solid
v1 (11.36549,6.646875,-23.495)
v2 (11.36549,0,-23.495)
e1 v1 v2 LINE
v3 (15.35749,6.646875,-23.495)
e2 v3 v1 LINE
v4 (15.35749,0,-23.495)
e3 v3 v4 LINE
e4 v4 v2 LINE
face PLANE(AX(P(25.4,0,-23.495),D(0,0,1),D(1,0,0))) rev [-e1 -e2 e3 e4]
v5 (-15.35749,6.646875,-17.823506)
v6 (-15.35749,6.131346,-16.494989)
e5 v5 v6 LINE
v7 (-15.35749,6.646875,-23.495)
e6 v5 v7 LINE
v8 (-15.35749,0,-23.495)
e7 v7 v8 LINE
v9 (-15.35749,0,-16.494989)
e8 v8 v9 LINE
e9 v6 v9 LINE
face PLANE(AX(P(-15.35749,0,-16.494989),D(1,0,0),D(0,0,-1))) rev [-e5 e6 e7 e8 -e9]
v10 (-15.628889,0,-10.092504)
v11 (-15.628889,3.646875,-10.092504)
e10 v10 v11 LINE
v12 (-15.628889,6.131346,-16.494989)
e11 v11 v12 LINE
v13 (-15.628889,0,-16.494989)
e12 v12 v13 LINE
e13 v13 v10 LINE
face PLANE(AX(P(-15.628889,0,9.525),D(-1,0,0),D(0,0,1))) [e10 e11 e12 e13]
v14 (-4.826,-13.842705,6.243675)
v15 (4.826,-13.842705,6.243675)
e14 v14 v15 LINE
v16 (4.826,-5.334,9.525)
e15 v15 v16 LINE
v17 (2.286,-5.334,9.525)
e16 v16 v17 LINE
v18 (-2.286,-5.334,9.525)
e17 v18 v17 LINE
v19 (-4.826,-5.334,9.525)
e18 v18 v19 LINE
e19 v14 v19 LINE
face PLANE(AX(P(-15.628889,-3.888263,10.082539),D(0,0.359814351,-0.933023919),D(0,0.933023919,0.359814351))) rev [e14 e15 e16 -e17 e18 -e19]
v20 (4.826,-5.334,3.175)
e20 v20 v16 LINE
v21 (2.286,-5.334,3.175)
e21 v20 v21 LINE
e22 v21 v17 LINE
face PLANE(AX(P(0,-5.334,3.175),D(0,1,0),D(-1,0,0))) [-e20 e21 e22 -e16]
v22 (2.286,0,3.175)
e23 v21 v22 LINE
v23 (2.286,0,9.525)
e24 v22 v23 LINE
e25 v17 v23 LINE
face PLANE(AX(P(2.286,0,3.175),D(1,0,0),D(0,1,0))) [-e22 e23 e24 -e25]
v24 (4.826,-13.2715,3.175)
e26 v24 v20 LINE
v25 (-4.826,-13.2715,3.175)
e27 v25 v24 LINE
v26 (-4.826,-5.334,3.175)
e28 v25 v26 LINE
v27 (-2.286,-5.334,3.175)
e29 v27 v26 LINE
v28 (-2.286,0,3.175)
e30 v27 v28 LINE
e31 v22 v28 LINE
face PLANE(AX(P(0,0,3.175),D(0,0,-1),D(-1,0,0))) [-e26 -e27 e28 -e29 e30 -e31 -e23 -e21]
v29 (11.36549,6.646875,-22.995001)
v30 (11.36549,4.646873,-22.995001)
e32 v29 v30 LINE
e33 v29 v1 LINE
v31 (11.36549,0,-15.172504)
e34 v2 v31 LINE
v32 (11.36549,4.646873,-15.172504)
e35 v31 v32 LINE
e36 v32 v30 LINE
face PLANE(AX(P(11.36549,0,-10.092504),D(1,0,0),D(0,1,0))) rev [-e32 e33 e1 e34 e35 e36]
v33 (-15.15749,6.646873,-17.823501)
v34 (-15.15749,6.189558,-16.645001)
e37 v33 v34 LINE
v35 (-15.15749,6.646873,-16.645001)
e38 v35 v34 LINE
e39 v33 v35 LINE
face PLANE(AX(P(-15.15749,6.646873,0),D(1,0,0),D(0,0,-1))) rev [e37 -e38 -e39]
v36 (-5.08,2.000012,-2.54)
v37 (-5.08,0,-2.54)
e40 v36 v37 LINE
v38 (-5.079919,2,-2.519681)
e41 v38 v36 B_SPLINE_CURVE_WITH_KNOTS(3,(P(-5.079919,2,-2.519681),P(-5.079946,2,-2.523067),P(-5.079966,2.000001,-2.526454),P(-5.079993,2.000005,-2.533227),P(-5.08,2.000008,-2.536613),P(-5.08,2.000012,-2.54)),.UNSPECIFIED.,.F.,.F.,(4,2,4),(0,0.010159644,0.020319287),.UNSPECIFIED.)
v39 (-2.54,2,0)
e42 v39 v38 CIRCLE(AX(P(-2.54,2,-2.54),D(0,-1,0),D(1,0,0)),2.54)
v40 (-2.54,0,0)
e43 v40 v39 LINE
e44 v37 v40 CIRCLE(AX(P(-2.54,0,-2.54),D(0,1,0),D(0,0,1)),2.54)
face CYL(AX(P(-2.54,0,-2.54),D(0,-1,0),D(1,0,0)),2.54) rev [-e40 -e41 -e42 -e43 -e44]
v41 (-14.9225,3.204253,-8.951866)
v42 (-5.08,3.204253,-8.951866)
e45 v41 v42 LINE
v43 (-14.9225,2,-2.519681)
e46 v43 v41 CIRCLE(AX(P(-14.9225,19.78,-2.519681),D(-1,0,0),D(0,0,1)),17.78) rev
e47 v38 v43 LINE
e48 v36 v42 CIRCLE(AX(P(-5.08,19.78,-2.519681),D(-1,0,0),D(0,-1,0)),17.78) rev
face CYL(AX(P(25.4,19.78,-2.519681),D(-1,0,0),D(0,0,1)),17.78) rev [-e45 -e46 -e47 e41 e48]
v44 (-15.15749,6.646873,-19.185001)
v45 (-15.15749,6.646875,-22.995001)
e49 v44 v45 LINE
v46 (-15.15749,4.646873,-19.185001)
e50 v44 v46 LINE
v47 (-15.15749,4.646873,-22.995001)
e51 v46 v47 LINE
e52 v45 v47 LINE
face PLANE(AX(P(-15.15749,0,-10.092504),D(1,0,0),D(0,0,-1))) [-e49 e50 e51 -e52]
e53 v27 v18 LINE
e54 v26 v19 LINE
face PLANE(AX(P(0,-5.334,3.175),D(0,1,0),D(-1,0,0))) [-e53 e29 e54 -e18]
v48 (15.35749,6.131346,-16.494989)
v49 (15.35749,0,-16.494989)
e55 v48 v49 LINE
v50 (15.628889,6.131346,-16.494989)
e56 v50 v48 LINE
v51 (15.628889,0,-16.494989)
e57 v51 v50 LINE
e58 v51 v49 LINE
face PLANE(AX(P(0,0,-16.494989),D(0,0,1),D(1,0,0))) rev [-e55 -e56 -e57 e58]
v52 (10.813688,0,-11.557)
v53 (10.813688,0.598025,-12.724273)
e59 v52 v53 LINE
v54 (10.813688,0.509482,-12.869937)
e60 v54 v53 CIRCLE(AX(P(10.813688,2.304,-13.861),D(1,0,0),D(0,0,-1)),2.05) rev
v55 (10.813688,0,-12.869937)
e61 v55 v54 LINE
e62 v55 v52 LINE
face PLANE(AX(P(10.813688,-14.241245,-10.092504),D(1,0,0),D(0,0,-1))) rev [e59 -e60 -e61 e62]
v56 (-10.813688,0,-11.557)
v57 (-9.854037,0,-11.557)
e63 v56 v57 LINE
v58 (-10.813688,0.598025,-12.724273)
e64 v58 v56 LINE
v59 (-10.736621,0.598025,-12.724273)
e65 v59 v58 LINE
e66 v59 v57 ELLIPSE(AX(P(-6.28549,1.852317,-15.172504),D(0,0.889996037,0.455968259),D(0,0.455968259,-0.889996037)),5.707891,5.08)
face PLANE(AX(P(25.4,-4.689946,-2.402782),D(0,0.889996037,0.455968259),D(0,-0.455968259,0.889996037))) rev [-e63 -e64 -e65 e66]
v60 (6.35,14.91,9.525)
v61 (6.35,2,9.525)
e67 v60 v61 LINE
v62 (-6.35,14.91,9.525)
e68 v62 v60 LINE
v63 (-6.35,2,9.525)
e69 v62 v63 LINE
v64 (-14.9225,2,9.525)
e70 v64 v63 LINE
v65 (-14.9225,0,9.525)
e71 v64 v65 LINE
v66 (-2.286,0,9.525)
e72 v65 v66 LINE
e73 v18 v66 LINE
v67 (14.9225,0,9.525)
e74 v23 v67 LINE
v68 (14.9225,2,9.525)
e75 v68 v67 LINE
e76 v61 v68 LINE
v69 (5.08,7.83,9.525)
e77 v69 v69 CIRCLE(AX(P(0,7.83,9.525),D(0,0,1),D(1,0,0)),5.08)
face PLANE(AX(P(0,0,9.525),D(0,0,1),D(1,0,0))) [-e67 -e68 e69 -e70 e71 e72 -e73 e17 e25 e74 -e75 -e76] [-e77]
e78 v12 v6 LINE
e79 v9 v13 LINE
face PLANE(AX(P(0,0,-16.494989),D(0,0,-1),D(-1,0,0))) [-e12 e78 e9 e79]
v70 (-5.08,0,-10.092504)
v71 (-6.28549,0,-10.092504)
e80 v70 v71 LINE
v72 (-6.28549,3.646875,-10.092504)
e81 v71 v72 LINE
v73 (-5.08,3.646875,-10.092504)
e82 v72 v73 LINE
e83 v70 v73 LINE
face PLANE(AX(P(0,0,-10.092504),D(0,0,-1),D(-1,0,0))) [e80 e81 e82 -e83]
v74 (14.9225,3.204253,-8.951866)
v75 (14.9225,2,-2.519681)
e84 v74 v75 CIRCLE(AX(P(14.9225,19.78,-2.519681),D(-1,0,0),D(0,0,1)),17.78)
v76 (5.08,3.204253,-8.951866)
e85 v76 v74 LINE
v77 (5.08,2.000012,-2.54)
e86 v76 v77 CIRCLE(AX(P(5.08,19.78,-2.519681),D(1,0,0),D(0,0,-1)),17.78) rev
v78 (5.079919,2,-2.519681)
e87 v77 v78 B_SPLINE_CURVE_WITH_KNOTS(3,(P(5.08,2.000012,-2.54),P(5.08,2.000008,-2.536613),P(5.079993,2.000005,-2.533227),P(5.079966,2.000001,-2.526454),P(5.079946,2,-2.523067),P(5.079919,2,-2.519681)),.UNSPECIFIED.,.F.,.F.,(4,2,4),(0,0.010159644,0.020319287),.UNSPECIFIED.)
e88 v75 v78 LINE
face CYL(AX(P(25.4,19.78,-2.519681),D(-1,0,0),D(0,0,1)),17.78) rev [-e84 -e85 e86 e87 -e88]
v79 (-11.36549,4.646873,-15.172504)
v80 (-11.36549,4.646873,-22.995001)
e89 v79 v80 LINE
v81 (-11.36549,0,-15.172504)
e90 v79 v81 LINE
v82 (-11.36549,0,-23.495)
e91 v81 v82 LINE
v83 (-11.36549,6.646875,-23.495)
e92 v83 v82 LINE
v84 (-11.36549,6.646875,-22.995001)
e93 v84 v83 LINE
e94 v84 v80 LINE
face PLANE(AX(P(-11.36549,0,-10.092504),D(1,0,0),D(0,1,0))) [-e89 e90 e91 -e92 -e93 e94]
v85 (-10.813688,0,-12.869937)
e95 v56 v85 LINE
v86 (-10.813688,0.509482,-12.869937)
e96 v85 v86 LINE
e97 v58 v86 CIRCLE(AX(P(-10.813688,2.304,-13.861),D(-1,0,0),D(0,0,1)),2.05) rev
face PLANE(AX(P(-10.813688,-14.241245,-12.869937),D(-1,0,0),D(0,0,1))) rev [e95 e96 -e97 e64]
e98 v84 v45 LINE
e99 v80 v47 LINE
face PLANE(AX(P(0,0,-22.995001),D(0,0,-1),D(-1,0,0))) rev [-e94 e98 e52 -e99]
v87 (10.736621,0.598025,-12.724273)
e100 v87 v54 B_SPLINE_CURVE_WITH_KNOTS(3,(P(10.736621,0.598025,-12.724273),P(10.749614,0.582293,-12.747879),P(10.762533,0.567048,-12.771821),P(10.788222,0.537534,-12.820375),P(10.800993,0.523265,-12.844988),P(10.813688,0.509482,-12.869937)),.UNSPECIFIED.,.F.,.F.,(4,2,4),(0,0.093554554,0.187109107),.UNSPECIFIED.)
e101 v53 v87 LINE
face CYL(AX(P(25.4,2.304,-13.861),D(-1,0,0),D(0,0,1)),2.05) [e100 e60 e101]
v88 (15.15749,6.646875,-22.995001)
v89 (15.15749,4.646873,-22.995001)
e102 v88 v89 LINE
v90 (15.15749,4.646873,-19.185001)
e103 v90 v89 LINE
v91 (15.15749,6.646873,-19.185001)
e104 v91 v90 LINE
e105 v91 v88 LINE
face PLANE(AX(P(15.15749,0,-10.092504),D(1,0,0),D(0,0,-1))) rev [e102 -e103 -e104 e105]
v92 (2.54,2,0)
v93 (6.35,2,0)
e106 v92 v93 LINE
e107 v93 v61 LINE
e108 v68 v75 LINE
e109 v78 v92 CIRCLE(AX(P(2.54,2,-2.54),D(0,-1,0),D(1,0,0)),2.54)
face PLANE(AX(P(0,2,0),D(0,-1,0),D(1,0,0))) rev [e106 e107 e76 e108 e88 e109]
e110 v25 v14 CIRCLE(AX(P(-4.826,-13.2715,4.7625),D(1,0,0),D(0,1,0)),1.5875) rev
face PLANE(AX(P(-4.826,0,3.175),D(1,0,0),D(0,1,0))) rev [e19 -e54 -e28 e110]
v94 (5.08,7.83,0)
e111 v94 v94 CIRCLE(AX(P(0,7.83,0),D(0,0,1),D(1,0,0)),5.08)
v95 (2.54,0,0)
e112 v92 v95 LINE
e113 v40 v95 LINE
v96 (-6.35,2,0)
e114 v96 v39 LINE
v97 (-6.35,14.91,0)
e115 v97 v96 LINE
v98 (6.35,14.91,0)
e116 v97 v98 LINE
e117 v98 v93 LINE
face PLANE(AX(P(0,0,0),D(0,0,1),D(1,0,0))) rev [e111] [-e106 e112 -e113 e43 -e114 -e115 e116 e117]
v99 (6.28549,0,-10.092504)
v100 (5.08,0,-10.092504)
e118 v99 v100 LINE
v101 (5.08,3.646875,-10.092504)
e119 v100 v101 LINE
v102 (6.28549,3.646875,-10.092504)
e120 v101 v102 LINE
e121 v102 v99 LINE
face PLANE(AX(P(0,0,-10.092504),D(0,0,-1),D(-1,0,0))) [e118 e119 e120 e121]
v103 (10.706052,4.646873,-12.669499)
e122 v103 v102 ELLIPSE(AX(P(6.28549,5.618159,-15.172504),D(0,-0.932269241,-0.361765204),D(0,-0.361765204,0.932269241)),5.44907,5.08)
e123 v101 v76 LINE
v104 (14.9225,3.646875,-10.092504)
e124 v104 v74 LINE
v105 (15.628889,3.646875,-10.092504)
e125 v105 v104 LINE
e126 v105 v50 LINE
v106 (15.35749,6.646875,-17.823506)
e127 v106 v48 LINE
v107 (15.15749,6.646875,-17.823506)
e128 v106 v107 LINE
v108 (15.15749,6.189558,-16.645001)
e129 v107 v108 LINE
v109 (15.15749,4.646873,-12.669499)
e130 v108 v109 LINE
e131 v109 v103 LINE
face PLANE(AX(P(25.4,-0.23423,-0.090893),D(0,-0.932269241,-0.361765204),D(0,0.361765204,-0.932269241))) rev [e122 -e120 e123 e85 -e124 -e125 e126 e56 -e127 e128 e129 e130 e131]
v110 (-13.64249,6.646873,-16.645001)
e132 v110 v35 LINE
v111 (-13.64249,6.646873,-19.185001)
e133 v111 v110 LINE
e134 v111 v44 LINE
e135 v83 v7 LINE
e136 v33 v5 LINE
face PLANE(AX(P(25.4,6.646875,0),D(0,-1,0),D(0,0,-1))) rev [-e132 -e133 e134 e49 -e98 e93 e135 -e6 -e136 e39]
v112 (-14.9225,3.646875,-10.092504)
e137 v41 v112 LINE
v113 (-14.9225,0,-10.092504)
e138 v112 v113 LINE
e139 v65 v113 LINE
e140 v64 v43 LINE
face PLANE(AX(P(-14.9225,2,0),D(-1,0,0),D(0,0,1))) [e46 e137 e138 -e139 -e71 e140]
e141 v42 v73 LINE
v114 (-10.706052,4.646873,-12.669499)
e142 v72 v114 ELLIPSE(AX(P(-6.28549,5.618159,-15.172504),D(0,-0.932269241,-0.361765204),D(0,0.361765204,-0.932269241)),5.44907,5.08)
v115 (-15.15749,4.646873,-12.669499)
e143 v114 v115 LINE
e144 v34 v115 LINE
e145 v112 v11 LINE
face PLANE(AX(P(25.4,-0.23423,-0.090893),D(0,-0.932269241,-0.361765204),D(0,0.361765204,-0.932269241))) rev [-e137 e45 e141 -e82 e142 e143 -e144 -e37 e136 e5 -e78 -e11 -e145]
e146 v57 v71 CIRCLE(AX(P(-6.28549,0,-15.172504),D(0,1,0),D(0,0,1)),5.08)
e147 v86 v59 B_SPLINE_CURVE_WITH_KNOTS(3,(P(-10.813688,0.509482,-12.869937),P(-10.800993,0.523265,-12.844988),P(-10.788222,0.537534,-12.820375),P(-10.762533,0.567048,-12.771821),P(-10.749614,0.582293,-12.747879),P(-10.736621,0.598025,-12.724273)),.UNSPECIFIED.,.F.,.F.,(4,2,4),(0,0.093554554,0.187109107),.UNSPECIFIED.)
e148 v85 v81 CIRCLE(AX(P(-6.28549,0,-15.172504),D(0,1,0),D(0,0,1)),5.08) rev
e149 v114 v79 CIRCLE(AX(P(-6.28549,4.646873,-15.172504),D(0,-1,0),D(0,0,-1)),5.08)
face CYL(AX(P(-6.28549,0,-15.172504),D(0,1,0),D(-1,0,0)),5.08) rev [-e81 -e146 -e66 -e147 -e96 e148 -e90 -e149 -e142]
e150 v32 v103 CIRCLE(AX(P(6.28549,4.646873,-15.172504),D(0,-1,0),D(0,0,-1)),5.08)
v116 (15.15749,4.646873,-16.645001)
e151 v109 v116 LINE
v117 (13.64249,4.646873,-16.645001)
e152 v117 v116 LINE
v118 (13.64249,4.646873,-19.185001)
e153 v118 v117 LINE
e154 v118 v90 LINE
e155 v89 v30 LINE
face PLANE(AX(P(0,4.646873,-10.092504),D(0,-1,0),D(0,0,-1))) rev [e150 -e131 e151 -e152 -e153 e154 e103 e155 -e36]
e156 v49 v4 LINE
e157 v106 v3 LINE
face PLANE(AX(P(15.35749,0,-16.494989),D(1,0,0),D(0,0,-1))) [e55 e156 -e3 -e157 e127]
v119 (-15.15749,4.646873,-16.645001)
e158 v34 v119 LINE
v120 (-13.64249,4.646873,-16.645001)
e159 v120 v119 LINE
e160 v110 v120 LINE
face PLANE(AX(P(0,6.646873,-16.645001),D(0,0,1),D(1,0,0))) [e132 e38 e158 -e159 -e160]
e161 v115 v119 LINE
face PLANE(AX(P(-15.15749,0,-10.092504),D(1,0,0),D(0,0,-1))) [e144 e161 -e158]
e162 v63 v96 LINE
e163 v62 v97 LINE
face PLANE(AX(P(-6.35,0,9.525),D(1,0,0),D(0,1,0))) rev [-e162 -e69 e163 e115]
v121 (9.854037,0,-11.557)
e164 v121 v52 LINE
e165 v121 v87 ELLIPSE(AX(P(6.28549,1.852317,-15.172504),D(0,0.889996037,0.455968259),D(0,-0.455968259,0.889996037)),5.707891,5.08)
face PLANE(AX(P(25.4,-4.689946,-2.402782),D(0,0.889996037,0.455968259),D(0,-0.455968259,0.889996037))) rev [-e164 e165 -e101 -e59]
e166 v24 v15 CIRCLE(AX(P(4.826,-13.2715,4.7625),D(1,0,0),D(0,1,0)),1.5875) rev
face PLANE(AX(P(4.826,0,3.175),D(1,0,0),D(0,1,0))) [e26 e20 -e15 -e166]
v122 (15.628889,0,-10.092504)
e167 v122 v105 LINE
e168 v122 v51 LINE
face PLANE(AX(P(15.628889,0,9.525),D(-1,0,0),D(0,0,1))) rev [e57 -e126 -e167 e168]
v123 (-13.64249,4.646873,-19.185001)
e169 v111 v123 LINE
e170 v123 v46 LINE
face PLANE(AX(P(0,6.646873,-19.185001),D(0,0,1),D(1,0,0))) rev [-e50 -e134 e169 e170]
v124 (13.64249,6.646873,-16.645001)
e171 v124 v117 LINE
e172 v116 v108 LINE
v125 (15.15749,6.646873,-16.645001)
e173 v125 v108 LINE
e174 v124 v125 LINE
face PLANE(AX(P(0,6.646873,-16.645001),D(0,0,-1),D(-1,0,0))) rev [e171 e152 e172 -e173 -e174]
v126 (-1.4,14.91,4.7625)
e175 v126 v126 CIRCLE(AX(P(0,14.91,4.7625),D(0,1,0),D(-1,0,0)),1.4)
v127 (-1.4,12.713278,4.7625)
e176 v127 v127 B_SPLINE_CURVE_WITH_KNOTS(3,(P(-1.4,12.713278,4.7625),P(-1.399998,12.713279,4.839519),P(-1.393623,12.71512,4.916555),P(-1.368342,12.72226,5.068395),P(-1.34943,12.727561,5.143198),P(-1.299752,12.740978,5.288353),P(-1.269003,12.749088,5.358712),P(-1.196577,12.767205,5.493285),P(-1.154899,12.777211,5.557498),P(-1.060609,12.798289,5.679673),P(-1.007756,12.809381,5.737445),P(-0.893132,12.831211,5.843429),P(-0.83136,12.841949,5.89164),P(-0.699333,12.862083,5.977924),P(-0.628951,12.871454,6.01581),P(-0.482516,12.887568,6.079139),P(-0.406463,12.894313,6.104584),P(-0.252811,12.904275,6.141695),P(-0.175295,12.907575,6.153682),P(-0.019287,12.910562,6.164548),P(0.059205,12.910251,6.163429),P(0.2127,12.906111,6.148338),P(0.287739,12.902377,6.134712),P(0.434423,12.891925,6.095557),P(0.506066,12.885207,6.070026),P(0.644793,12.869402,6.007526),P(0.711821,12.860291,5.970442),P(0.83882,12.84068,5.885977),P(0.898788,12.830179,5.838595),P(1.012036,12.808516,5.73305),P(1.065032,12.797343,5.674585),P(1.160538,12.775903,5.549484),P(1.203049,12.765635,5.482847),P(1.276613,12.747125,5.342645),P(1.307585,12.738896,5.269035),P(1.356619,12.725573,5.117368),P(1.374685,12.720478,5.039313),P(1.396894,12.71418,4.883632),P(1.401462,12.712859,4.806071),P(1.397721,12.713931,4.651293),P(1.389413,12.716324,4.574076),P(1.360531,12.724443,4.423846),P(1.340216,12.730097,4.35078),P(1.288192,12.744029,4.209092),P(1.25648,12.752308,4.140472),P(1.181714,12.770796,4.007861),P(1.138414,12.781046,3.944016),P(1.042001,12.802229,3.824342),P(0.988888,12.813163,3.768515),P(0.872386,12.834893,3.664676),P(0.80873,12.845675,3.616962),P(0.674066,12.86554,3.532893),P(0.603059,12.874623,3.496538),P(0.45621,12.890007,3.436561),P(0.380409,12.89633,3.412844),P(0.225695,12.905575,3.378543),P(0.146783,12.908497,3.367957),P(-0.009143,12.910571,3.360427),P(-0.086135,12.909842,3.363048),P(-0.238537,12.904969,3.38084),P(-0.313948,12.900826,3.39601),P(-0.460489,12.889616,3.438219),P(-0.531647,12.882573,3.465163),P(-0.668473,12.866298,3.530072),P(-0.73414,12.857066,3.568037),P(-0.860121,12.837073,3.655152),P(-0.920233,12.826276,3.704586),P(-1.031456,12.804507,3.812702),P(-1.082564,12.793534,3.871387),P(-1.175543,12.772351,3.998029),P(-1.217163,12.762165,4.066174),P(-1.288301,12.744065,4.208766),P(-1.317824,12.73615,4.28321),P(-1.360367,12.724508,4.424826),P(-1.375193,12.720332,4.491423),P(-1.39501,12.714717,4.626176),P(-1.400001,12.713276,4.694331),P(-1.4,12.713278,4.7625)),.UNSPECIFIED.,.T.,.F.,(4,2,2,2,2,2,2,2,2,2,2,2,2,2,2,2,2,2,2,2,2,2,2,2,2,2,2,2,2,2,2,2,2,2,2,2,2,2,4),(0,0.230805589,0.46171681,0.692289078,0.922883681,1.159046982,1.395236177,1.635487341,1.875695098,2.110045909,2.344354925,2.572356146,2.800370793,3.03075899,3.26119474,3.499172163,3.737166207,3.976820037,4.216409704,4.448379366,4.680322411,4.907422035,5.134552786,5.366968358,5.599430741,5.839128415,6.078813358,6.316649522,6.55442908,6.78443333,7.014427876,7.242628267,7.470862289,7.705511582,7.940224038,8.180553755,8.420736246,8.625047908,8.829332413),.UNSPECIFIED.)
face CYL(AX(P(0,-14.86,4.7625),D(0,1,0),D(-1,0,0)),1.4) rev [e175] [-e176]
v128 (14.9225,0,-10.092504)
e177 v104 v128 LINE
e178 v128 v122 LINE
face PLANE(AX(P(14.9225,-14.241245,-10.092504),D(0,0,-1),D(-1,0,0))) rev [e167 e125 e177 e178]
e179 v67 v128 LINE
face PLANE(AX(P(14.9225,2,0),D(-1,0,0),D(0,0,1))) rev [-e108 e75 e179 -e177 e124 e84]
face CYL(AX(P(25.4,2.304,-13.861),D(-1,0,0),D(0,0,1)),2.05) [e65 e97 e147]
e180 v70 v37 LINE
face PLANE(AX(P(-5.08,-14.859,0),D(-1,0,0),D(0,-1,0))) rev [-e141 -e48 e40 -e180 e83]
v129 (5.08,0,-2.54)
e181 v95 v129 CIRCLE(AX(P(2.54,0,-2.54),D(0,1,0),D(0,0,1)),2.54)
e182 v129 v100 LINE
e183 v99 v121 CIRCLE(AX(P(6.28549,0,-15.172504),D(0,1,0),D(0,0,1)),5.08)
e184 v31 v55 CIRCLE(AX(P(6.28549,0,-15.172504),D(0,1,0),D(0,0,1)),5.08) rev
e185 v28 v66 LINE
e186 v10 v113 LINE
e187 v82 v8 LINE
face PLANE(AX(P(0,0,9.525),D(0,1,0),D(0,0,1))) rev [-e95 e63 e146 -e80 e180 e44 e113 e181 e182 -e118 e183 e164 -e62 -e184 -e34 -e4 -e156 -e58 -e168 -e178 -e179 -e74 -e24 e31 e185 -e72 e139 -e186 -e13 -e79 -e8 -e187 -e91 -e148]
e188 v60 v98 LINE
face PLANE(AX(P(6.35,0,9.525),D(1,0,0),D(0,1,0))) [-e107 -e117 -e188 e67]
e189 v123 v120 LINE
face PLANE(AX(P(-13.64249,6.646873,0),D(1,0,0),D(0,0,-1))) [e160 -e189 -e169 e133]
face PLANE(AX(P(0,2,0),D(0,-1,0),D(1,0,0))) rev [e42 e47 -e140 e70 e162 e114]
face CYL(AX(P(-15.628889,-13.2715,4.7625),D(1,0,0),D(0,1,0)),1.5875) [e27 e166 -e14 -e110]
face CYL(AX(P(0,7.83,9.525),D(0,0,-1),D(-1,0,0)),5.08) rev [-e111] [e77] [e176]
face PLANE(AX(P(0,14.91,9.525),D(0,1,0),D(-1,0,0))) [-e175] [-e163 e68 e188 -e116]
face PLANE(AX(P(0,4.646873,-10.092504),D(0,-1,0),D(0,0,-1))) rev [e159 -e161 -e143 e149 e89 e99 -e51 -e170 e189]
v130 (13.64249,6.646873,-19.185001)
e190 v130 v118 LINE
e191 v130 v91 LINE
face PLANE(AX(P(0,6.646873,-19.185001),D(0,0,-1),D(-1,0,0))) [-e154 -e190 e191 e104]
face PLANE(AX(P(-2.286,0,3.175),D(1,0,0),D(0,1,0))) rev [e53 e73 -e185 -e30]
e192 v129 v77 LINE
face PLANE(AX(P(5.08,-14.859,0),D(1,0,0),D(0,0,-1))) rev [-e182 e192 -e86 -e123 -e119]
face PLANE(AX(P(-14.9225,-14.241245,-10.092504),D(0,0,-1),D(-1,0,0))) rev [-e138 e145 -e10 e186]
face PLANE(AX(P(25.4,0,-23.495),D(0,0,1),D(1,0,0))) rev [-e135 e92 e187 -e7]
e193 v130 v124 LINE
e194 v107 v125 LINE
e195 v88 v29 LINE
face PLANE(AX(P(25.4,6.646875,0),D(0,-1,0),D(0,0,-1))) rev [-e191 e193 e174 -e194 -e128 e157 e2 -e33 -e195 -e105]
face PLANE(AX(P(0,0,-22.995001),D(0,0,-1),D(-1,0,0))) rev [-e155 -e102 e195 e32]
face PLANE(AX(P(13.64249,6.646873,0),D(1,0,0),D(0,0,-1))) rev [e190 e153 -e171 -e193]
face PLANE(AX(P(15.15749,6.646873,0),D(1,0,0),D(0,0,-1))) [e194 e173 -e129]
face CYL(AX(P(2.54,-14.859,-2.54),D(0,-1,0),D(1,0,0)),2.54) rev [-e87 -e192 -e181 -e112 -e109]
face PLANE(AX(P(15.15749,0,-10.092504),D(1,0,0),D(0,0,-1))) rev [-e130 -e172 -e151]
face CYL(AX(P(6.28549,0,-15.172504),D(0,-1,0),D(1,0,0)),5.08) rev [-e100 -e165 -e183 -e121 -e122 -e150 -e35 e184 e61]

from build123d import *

# Parameters (mm, degrees)
SKETCH2_W                = 12.7
SKETCH2_H                = 14.91
SKETCH2_R                = 5.08
BOSS_EXTRUDE1_DEPTH      = 9.525
BOSS_EXTRUDE2_START      = 9.525
BOSS_EXTRUDE2_DEPTH      = 6.35
BOSS_EXTRUDE3_DEPTH      = 2
BOSS_EXTRUDE7_START      = -25.4
BOSS_EXTRUDE7_DEPTH      = 50.8
SKETCH5_W                = 9.77111141
SKETCH5_H                = 3
CUT_EXTRUDE1_DEPTH       = 68.279429146
CUT_EXTRUDE2_START       = -12.902497
SKETCH6_W                = 30.31497918
SKETCH6_H                = 2.000002
SKETCH6_W_2              = 22.73097918
SKETCH6_H_2              = 6.646875
CUT_EXTRUDE2_DEPTH       = 12.902497
CUT_EXTRUDE3_START       = 0.499999
SKETCH6_3_W              = 22.73097918
SKETCH6_3_H              = 2.000002
SKETCH6_3_H_2            = 4.646873
SKETCH6_3_W_2            = 0.271399
SKETCH6_3_H_3            = 3
CUT_EXTRUDE3_DEPTH       = 7.0000114
FILLET2_R                = 17.78
CUT_EXTRUDE4_DEPTH       = 33.871006443
CUT_EXTRUDE4_DEPTH_BACK  = 33.871006443
SKETCH7_W                = 10.16
SKETCH7_H                = 10.092503778
FILLET3_R                = 2.54
SKETCH8_W                = 1.515
SKETCH8_H                = 2.54
BOSS_EXTRUDE8_DEPTH      = 2
FILLET4_R                = 5.08
CUT_EXTRUDE5_DEPTH       = 35.535859512
BOSS_EXTRUDE9_DEPTH      = 3.646875
SET_SCREW_CUT_REACH      = 43.018
SET_SCREW_CUT_END_RADIUS = 5.08
SKETCH12_R               = 1.4


# Read off the part's stored shape, not the designer's step: Boss-Extrude7
with BuildPart() as part:
    # Sketch2 → Boss-Extrude1 (new body)
    with BuildSketch(Plane.XY):
        with Locations((0, 7.455)):
            Rectangle(SKETCH2_W, SKETCH2_H)
        with Locations(Location((0, 7.83, 0), (0, 0, 180))):
            Circle(SKETCH2_R, mode=Mode.SUBTRACT)
    extrude(amount=BOSS_EXTRUDE1_DEPTH)

    # Sketch2<3> → Boss-Extrude2 (add)
    with BuildSketch(Plane.XY.offset(BOSS_EXTRUDE2_START)):
        Polygon((2.286, 0), (-2.286, 0), (-2.286, -5.334), (-4.826, -5.334), (-4.826, -14.859), (4.826, -14.859), (4.826, -5.334), (2.286, -5.334), align=None)
    extrude(amount=-BOSS_EXTRUDE2_DEPTH)

    # Sketch3 → Boss-Extrude3 (add)
    with BuildSketch(Plane.XZ):
        Polygon((14.9225, 9.525), (-14.9225, 9.525), (-14.9225, -11.557), (-10.85748959, -11.557), (10.85748959, -11.557), (14.9225, -11.557), align=None)
    extrude(amount=-BOSS_EXTRUDE3_DEPTH)

    # Boss-Extrude7 outline → Boss-Extrude7 (add)
    with BuildSketch(Plane(origin=(0, 0, 0), x_dir=(0, 0, -1), z_dir=(1, 0, 0)).offset(BOSS_EXTRUDE7_START)):
        with BuildLine():
            Line((5.848505491, 2), (11.557, 0))
            Line((11.557, 0), (12.724273166, 0.598024588))
            ThreePointArc((12.724273166, 0.598024588), (12.796184179, 0.55223881), (12.869936616, 0.509482413))
            Line((12.869936616, 0.509482413), (20.955, 3.646875))
            Line((20.955, 3.646875), (23.495, 3.646875))
            Line((23.495, 3.646875), (23.495, 6.646875))
            Line((23.495, 6.646875), (17.823506348, 6.646875))
            Line((17.823506348, 6.646875), (5.848505491, 2))
        make_face()
    extrude(amount=BOSS_EXTRUDE7_DEPTH)

    # Sketch5 → Cut-Extrude1 (cut, through all)
    with BuildSketch(Plane(origin=(0, 37.971305566, -23.495), x_dir=(1, 0, 0), z_dir=(0, 0, 1))):
        Polygon((25.4, -37.971305566), (25.4, -34.324430566), (15.62888859, -34.324430566), (14.9225, -34.324430566), (14.9225, -37.971305566), align=None)
        with Locations((20.514444295, -32.824430566)):
            Rectangle(SKETCH5_W, SKETCH5_H)
        Polygon((-25.4, -34.324430566), (-25.4, -37.971305566), (-14.9225, -37.971305566), (-14.9225, -34.324430566), (-15.62888859, -34.324430566), align=None)
        with Locations((-20.514444295, -32.824430566)):
            Rectangle(SKETCH5_W, SKETCH5_H)
    extrude(amount=CUT_EXTRUDE1_DEPTH, mode=Mode.SUBTRACT)

    # Sketch6 → Cut-Extrude2 (cut)
    with BuildSketch(Plane(origin=(0, 0, -22.995001), x_dir=(-1, 0, 0), z_dir=(0, 0, -1)).offset(CUT_EXTRUDE2_START)):
        with Locations((0, 5.646874)):
            Rectangle(SKETCH6_W, SKETCH6_H)
        with Locations((0, 3.3234375)):
            Rectangle(SKETCH6_W_2, SKETCH6_H_2)
    extrude(amount=CUT_EXTRUDE2_DEPTH, mode=Mode.SUBTRACT)

    # Sketch6<3> → Cut-Extrude3 (cut)
    with BuildSketch(Plane(origin=(0, 0, -22.995001), x_dir=(-1, 0, 0), z_dir=(0, 0, -1)).offset(CUT_EXTRUDE3_START)):
        with Locations((0, 5.646874)):
            Rectangle(SKETCH6_3_W, SKETCH6_3_H)
        with Locations((0, 2.3234365)):
            Rectangle(SKETCH6_3_W, SKETCH6_3_H_2)
        with Locations((-15.49318909, 5.146875)):
            Rectangle(SKETCH6_3_W_2, SKETCH6_3_H_3)
        with Locations((15.49318909, 5.146875)):
            Rectangle(SKETCH6_3_W_2, SKETCH6_3_H_3)
    extrude(amount=-CUT_EXTRUDE3_DEPTH, mode=Mode.SUBTRACT)

    # Fillet2
    fillet2_edges = [part.edges().sort_by_distance(p)[0] for p in [
        (0, 2, -5.848505491),
    ]]
    fillet(fillet2_edges, radius=FILLET2_R)

    # Sketch7 → Cut-Extrude4 (cut, two sides: drawn at the far end of the back side and taken through both)
    with BuildSketch(Plane(origin=(0, 2, 0), x_dir=(1, 0, 0), z_dir=(0, 1, 0)).offset(-CUT_EXTRUDE4_DEPTH_BACK)):
        with Locations((0, 5.046251889)):
            Rectangle(SKETCH7_W, SKETCH7_H)
    extrude(amount=CUT_EXTRUDE4_DEPTH + CUT_EXTRUDE4_DEPTH_BACK, mode=Mode.SUBTRACT)

    # Fillet3
    # the kernel refuses this fillet: 2.54 mm, written as the material it adds along each edge
    with BuildSketch(Plane(origin=(-5.08, 2, 0), x_dir=(1, 0, 0), z_dir=(0, -1, 0))) as fillet3_piece_1:
        with BuildLine():
            CenterArc((FILLET3_R, -FILLET3_R), FILLET3_R, 90, 90)
            Line((0, -FILLET3_R), (-FILLET3_R * 0.02, -FILLET3_R))
            Line((-FILLET3_R * 0.02, -FILLET3_R), (-FILLET3_R * 0.02, FILLET3_R * 0.02))
            Line((-FILLET3_R * 0.02, FILLET3_R * 0.02), (FILLET3_R, FILLET3_R * 0.02))
            Line((FILLET3_R, FILLET3_R * 0.02), (FILLET3_R, 0))
        make_face()
    extrude(amount=2)
    with BuildSketch(Plane(origin=(5.08, 0, 0), x_dir=(0, 0, -1), z_dir=(0, 1, 0))) as fillet3_piece_2:
        with BuildLine():
            CenterArc((FILLET3_R, FILLET3_R), FILLET3_R, 180, 90)
            Line((0, FILLET3_R), (-FILLET3_R * 0.02, FILLET3_R))
            Line((-FILLET3_R * 0.02, FILLET3_R), (-FILLET3_R * 0.02, -FILLET3_R * 0.02))
            Line((-FILLET3_R * 0.02, -FILLET3_R * 0.02), (FILLET3_R, -FILLET3_R * 0.02))
            Line((FILLET3_R, -FILLET3_R * 0.02), (FILLET3_R, 0))
        make_face()
    extrude(amount=2)

    # Sketch8 → Boss-Extrude8 (add)
    with BuildSketch(Plane(origin=(0, 4.646873, 0), x_dir=(1, 0, 0), z_dir=(0, 1, 0))):
        with Locations((-14.39998959, 17.915001)):
            Rectangle(SKETCH8_W, SKETCH8_H)
        with Locations((14.39998959, 17.915001)):
            Rectangle(SKETCH8_W, SKETCH8_H)
    extrude(amount=BOSS_EXTRUDE8_DEPTH)

    # Fillet4
    fillet4_edges = [part.edges().sort_by_distance(p)[0] for p in [
        (11.36548959, 1.823437543, -10.092504),
        (-11.36548959, 1.823437543, -10.092504),
    ]]
    fillet(fillet4_edges, radius=FILLET4_R)

    # Sketch10 → Cut-Extrude5 (cut, through all)
    with BuildSketch(Plane(origin=(4.826, 0, 0), x_dir=(0, 0, -1), z_dir=(1, 0, 0))):
        with BuildLine():
            Line((-6.243675471, -13.842705282), (-9.525, -5.334))
            Line((-9.525, -5.334), (-9.525, -14.859))
            Line((-9.525, -14.859), (-4.7625, -14.859))
            ThreePointArc((-4.7625, -14.859), (-5.660655851, -14.580496684), (-6.243675471, -13.842705282))
        make_face()
        with BuildLine():
            ThreePointArc((-3.175, -13.2715), (-3.639967985, -14.394032015), (-4.7625, -14.859))
            Line((-4.7625, -14.859), (-3.175, -14.859))
            Line((-3.175, -14.859), (-3.175, -13.2715))
        make_face()
    extrude(amount=-CUT_EXTRUDE5_DEPTH, mode=Mode.SUBTRACT)

    # Sketch11 → Boss-Extrude9 (add)
    with BuildSketch(Plane.XZ.offset(-3.646875)):
        with BuildLine():
            Line((11.36548959, -20.955), (11.36548959, -15.172503778))
            ThreePointArc((11.36548959, -15.172503778), (11.225613574, -13.98862244), (10.8136884, -12.869936616))
            Line((10.8136884, -12.869936616), (10.8136884, -10.092503778))
            Line((10.8136884, -10.092503778), (14.9225, -10.092503778))
            Line((14.9225, -10.092503778), (15.62888859, -10.092503778))
            Line((15.62888859, -10.092503778), (15.62888859, -16.4949886))
            Line((15.62888859, -16.4949886), (15.35748959, -16.4949886))
            Line((15.35748959, -16.4949886), (15.35748959, -23.495))
            Line((15.35748959, -23.495), (11.36548959, -23.495))
            Line((11.36548959, -23.495), (11.36548959, -20.955))
        make_face()
        with BuildLine():
            Line((-14.9225, -10.092503778), (-10.8136884, -10.092503778))
            Line((-10.8136884, -10.092503778), (-10.8136884, -12.869936616))
            ThreePointArc((-10.8136884, -12.869936616), (-11.225613574, -13.98862244), (-11.36548959, -15.172503778))
            Line((-11.36548959, -15.172503778), (-11.36548959, -20.955))
            Line((-11.36548959, -20.955), (-11.36548959, -23.495))
            Line((-11.36548959, -23.495), (-15.35748959, -23.495))
            Line((-15.35748959, -23.495), (-15.35748959, -16.4949886))
            Line((-15.35748959, -16.4949886), (-15.62888859, -16.4949886))
            Line((-15.62888859, -16.4949886), (-15.62888859, -10.092503778))
            Line((-15.62888859, -10.092503778), (-14.9225, -10.092503778))
        make_face()
    extrude(amount=BOSS_EXTRUDE9_DEPTH)

    # Set Screw Cut: up to this cylinder (the profile starts outside it)
    set_screw_cut_end = Plane(origin=(0, 7.83, 4.7625), z_dir=(0, 0, -1)) * Cylinder(SET_SCREW_CUT_END_RADIUS, 97.196, mode=Mode.PRIVATE)
    # Sketch12 → Set Screw Cut (cut, up to the surface)
    with BuildSketch(Plane(origin=(0, 14.91, 0), x_dir=(1, 0, 0), z_dir=(0, 1, 0)), mode=Mode.PRIVATE) as set_screw_cut_sk1:
        with Locations(Location((0, -4.7625, 0), (0, 0, 180))):
            Circle(SKETCH12_R)
    set_screw_cut_tool1 = extrude(set_screw_cut_sk1.sketch, amount=-SET_SCREW_CUT_REACH, mode=Mode.PRIVATE) - set_screw_cut_end
    add(set_screw_cut_tool1.solids().sort_by_distance((0, 14.91, 4.7625))[0], mode=Mode.SUBTRACT)


solid = part.part
